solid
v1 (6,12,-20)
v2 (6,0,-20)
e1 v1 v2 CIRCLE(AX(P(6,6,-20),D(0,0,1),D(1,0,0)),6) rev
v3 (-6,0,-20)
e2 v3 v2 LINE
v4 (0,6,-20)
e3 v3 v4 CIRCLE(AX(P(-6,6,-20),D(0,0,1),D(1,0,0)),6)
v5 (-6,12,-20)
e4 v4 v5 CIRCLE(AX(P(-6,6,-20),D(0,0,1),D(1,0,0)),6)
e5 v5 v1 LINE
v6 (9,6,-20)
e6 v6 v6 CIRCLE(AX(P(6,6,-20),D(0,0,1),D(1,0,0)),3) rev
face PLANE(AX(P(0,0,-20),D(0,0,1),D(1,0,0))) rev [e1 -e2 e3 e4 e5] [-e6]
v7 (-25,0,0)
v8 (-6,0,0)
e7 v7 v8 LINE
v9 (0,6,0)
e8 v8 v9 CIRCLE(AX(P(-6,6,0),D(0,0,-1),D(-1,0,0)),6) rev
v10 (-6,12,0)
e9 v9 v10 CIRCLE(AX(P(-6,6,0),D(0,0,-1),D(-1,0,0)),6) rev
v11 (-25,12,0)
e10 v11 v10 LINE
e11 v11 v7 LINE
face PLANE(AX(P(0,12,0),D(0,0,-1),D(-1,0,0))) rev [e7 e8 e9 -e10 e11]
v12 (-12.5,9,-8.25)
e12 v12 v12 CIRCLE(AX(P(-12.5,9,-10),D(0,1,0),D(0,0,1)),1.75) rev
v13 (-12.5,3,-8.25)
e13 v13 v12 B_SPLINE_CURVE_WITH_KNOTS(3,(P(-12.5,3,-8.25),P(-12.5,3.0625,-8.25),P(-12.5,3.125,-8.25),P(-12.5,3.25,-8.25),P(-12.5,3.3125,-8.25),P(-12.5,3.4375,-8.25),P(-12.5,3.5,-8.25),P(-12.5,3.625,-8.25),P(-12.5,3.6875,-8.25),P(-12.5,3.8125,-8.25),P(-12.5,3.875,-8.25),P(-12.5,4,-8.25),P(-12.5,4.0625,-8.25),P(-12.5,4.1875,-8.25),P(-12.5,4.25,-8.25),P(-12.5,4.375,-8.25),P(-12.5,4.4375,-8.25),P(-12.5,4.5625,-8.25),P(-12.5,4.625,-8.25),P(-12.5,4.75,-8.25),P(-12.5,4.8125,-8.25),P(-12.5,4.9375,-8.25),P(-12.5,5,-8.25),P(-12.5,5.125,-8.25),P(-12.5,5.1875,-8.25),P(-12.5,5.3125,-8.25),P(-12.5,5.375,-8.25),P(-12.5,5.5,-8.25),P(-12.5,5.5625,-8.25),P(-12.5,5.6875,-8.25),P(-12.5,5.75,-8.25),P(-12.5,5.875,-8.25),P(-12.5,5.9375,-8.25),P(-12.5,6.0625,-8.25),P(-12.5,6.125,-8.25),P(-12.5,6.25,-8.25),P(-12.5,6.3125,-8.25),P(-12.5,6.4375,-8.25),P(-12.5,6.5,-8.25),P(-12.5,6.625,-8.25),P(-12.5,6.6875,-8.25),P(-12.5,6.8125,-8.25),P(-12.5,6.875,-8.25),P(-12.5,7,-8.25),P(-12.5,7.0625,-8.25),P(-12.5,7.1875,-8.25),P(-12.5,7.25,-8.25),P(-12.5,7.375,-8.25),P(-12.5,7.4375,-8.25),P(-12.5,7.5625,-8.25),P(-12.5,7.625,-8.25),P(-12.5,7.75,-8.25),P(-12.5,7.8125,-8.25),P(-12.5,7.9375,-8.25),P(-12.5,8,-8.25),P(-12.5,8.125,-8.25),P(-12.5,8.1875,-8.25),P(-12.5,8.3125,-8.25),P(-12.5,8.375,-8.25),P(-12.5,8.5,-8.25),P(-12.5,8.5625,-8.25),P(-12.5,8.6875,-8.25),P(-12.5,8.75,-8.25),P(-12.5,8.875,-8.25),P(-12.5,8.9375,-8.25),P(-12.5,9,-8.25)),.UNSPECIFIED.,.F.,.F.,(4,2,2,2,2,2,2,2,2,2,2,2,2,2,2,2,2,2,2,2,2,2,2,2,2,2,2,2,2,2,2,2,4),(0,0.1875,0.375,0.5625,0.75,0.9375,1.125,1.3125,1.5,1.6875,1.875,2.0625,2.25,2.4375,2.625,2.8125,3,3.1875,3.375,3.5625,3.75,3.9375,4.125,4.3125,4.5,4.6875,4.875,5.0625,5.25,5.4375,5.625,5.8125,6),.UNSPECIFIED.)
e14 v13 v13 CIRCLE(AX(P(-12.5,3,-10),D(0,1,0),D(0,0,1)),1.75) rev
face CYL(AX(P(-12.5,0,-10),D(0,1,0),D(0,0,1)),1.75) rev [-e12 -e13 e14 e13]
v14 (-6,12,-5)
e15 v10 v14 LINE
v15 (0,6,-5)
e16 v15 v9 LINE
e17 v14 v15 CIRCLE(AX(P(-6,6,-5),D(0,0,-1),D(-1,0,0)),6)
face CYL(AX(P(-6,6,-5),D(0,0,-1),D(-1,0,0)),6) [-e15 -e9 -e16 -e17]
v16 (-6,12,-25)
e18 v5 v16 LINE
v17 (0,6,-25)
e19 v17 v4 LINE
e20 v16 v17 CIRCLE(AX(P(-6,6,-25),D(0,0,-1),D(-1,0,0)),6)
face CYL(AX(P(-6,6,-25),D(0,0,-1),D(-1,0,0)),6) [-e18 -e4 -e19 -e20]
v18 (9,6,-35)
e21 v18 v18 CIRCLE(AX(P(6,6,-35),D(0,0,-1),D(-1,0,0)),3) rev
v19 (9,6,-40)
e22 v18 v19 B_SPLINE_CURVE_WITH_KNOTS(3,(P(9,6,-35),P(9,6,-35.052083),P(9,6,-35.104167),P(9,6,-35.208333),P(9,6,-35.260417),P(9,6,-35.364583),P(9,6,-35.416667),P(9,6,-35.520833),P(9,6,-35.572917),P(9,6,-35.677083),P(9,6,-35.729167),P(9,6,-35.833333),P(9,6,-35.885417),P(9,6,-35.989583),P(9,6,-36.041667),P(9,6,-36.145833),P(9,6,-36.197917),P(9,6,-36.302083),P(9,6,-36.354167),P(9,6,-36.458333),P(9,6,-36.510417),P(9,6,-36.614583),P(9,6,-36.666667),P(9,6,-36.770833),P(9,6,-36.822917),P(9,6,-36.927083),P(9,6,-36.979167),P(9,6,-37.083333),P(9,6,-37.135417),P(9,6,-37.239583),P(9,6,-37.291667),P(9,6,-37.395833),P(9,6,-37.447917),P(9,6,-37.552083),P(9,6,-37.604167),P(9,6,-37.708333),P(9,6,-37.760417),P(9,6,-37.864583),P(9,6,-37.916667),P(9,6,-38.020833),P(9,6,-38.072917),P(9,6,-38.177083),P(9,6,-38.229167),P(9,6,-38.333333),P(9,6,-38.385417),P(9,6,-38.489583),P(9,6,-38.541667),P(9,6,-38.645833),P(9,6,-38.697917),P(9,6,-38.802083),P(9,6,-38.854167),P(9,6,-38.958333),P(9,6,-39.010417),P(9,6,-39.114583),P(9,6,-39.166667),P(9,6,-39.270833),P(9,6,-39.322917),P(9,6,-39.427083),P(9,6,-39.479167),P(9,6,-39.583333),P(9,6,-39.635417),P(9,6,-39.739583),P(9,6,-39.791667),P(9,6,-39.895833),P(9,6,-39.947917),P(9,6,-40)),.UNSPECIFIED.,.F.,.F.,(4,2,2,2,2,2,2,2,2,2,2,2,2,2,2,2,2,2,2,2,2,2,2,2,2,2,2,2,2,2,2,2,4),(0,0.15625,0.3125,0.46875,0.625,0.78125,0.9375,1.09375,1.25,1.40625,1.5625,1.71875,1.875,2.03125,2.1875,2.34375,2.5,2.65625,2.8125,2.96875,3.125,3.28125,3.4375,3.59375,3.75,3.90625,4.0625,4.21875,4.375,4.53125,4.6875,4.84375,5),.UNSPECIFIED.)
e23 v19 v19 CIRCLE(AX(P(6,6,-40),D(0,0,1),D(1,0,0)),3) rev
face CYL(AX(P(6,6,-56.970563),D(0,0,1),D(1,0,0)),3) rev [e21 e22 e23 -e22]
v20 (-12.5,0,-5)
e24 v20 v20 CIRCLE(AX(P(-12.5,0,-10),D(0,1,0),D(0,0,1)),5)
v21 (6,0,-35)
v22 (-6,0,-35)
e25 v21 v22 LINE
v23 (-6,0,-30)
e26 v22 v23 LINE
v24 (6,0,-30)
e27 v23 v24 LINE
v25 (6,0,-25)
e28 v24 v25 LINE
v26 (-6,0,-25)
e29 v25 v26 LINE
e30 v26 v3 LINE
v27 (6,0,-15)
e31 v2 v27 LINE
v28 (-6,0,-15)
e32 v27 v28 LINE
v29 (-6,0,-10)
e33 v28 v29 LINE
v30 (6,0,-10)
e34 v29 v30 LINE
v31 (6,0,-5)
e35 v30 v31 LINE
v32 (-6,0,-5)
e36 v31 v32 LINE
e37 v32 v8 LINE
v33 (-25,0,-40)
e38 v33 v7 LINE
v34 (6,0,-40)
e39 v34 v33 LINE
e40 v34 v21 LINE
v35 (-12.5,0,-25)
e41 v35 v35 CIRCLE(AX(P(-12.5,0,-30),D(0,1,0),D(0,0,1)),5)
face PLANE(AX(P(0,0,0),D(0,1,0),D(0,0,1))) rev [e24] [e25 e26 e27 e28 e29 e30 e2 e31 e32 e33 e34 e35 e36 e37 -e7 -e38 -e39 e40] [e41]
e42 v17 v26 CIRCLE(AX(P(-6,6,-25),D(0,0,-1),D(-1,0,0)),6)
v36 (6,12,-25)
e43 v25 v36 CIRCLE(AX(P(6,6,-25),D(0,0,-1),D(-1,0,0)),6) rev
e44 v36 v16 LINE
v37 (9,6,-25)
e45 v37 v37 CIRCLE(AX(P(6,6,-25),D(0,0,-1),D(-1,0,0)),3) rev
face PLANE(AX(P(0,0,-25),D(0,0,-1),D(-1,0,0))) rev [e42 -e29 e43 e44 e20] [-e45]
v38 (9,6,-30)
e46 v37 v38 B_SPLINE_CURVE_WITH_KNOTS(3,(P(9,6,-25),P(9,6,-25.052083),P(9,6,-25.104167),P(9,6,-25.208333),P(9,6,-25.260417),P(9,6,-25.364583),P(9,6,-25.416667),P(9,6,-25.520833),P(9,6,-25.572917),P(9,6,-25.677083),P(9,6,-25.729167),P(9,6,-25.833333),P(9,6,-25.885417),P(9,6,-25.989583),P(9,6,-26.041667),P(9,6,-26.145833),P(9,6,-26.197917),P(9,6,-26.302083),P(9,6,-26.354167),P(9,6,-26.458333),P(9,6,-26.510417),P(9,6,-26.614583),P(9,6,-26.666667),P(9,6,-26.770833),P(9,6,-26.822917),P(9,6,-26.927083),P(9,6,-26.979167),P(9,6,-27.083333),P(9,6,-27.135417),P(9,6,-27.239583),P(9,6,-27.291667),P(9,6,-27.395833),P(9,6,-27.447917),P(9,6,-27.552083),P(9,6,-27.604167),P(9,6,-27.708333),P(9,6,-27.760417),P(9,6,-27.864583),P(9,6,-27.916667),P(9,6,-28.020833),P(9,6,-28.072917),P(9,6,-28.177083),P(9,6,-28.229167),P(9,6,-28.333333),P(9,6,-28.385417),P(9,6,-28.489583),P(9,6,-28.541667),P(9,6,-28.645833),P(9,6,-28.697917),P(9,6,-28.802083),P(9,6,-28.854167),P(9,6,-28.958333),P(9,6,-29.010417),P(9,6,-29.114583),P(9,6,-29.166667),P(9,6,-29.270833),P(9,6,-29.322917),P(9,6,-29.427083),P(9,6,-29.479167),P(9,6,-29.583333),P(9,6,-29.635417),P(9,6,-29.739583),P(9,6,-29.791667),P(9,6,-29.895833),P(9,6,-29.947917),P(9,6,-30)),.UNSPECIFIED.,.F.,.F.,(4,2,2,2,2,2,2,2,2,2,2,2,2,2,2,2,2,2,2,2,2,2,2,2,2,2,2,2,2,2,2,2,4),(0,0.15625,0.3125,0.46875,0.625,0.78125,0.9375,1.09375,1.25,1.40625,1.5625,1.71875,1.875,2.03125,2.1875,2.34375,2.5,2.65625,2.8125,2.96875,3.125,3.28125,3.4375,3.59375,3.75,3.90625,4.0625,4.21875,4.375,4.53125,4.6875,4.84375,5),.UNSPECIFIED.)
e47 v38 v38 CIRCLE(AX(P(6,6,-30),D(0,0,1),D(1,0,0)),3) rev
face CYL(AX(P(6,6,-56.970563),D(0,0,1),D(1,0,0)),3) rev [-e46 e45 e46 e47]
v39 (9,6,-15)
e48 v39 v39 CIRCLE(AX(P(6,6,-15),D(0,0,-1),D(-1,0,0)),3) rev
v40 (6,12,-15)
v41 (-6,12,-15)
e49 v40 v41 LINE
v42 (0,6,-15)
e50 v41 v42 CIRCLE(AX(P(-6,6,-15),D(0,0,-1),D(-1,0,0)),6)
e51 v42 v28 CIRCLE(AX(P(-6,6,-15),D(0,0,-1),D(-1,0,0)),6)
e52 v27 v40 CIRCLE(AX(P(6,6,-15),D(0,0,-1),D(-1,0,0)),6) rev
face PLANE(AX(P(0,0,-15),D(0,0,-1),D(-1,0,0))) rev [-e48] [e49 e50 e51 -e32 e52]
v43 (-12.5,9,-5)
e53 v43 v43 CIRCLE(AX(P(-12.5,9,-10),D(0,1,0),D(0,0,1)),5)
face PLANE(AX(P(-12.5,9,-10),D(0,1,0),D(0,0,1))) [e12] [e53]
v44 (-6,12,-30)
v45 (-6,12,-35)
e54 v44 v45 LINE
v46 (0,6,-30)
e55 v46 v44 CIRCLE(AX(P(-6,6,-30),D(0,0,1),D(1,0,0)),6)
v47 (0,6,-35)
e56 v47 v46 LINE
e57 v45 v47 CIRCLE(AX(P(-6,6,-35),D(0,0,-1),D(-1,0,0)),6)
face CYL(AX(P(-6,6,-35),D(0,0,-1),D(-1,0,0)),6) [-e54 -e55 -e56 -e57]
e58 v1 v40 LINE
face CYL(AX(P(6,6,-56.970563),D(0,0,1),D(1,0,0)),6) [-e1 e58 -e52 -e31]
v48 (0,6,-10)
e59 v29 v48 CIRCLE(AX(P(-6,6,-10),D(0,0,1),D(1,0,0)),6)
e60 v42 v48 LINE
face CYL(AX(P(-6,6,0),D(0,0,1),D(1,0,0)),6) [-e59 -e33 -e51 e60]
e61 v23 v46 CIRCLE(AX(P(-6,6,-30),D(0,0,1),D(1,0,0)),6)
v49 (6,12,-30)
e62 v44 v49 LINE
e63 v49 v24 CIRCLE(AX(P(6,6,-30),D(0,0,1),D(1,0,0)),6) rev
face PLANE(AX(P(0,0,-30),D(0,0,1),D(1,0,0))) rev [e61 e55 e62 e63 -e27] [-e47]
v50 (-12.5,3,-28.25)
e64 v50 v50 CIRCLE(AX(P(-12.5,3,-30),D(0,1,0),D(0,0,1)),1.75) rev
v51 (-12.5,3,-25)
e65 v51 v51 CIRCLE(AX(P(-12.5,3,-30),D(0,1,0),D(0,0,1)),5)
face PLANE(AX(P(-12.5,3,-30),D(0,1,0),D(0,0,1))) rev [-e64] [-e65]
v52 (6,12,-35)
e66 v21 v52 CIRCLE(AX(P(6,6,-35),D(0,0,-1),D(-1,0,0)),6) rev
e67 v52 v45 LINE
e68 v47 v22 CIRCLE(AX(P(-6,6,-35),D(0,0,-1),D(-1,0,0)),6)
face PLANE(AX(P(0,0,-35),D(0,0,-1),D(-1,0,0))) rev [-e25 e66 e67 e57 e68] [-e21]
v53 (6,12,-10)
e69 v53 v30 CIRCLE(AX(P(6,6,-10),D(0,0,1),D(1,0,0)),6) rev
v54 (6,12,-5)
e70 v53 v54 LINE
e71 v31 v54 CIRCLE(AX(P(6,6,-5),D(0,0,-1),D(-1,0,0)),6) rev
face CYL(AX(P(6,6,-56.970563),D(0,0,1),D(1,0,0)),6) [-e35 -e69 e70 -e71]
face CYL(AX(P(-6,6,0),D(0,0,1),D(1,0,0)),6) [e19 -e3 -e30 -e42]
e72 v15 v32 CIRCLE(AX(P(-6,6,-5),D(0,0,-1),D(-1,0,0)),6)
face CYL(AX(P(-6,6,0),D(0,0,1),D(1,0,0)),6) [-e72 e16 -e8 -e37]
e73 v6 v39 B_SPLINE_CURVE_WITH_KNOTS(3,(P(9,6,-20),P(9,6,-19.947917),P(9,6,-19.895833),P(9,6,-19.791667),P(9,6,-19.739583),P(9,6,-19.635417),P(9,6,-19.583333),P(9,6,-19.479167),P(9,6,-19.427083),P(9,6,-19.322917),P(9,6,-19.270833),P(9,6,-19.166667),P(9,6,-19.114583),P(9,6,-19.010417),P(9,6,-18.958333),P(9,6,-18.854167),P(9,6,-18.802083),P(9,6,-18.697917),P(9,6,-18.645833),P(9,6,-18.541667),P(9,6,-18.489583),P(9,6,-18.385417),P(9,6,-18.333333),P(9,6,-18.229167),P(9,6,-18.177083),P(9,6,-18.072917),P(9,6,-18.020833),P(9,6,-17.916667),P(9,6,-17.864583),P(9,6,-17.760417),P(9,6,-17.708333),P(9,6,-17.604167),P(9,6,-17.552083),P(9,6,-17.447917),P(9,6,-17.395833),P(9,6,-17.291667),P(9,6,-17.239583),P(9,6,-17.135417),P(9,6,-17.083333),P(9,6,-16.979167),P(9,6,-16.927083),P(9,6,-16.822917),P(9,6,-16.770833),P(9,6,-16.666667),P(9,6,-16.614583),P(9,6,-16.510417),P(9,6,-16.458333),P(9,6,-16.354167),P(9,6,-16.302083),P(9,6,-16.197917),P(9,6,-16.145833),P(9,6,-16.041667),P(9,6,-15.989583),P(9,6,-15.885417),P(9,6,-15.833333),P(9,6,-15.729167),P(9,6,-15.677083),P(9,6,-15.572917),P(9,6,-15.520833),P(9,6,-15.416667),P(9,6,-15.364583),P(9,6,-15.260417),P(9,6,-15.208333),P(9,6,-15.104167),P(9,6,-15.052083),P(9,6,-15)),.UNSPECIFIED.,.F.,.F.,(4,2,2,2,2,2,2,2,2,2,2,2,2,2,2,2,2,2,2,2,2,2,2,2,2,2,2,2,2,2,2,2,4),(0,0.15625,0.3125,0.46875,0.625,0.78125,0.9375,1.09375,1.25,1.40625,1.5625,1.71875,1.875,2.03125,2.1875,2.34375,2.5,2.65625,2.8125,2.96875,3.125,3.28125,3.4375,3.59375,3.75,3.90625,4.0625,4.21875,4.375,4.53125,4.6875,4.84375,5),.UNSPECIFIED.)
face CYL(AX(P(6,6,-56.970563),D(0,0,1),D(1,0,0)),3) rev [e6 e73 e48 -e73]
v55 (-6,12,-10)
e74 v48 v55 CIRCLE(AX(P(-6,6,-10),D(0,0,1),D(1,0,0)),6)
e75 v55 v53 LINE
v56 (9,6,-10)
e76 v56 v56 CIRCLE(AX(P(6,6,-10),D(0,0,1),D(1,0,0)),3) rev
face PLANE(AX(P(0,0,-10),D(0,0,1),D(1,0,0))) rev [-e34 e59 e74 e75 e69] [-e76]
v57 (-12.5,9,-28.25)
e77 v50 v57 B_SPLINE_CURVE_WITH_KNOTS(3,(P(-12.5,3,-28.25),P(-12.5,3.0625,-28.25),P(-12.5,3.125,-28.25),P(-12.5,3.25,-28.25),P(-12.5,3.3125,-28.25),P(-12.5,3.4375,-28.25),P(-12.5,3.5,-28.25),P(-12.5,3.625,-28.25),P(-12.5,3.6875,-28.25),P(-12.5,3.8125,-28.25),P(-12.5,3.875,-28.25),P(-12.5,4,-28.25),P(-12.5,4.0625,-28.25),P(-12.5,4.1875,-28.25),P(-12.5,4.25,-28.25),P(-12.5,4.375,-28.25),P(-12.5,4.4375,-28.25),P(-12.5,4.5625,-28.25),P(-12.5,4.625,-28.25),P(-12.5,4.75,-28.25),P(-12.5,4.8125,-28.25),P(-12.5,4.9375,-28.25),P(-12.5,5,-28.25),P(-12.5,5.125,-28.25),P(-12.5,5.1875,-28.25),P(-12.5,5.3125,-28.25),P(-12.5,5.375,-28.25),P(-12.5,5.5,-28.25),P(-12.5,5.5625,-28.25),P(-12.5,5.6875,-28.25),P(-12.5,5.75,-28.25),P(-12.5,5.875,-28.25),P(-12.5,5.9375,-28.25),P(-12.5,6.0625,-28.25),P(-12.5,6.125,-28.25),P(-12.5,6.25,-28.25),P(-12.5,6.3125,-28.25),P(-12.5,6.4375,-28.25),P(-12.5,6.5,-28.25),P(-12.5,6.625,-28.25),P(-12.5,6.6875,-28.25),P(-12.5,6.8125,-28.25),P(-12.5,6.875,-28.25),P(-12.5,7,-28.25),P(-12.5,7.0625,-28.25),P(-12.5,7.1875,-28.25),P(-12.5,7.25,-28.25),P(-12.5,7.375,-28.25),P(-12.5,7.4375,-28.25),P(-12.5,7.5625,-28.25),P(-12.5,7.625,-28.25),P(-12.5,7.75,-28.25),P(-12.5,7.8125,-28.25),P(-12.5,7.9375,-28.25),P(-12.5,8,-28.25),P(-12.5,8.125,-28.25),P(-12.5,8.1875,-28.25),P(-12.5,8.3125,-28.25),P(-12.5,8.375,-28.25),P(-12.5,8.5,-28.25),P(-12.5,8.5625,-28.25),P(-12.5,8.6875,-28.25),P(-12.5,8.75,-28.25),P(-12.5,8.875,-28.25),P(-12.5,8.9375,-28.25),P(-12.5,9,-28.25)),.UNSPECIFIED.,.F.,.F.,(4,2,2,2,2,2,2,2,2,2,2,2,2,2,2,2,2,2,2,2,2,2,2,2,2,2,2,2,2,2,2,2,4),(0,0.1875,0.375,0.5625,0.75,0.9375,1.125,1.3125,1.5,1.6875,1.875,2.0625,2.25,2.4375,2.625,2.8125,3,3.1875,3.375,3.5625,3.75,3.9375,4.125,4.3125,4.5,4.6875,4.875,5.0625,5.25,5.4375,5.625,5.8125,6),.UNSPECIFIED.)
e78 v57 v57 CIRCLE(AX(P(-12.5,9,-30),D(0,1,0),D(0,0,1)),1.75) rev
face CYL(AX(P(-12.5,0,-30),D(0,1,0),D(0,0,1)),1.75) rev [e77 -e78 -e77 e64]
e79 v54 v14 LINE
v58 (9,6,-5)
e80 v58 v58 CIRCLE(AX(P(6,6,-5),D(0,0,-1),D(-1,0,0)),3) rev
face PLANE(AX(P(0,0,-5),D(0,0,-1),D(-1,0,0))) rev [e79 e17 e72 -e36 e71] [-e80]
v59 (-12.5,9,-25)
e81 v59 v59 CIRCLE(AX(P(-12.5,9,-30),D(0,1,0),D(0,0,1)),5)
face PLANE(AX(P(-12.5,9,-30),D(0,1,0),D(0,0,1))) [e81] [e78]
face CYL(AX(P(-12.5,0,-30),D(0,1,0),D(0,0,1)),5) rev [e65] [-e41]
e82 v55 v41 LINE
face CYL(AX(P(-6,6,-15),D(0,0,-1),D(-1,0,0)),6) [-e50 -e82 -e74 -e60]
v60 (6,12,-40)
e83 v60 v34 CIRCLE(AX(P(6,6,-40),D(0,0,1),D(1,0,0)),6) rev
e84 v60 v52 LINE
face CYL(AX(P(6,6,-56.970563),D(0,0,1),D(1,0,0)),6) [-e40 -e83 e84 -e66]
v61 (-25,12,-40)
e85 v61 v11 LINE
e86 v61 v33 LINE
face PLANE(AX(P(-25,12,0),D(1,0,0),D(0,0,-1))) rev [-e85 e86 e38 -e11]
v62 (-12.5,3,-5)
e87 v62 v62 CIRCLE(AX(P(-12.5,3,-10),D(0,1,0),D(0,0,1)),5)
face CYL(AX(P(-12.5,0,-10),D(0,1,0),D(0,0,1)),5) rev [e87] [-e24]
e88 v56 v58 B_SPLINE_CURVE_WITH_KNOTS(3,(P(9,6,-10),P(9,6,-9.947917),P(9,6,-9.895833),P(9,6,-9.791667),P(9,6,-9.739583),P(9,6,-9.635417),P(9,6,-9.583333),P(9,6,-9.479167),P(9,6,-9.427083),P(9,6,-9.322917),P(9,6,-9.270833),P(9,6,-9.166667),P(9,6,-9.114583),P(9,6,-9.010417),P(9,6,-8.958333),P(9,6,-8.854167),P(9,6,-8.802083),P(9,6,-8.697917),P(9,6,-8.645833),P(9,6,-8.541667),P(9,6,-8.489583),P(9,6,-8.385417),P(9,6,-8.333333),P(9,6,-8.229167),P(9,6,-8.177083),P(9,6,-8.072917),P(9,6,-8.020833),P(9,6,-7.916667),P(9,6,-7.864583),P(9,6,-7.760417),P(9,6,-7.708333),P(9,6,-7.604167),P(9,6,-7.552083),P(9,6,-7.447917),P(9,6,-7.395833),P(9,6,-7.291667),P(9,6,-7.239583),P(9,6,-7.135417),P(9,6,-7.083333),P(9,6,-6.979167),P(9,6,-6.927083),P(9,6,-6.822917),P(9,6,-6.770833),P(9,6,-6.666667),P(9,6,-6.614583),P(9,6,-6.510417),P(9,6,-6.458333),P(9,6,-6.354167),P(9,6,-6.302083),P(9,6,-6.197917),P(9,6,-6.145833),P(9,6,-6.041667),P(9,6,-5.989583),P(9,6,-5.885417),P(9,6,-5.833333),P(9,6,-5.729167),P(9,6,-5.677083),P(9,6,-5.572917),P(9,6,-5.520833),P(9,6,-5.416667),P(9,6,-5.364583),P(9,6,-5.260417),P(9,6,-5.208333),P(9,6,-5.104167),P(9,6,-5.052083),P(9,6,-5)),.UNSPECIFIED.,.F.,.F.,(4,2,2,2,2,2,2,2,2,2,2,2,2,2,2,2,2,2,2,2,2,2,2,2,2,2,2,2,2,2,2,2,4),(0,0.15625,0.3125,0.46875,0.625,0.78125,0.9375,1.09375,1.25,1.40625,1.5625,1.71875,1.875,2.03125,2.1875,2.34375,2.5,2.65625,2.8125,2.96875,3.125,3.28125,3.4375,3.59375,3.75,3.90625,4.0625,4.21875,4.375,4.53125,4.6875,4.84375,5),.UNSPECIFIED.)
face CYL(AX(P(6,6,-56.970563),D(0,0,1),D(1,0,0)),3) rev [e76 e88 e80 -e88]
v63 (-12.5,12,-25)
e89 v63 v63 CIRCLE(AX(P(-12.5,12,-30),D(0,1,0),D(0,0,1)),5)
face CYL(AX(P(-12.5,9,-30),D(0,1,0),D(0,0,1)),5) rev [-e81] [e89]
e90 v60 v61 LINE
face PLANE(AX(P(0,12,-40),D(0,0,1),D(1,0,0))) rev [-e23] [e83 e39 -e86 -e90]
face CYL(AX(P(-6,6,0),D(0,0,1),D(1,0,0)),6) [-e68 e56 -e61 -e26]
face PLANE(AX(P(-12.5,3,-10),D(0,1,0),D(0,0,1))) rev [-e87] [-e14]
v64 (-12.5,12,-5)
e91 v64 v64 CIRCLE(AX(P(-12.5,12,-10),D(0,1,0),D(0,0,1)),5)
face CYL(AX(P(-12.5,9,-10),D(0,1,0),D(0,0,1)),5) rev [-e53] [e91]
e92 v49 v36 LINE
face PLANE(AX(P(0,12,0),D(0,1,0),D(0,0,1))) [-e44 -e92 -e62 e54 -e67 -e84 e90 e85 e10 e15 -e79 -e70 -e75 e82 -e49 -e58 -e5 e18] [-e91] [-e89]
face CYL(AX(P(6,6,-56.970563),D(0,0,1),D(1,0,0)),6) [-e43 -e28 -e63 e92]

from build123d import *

# Parameters (mm, degrees)
SKETCH1_W           = 25
SKETCH1_H           = 40
BOSS_EXTRUDE1_DEPTH = 12
SKETCH2_R           = 3
BOSS_EXTRUDE2_DEPTH = 40
SKETCH3_W           = 12
SKETCH3_H           = 5
CUT_EXTRUDE1_DEPTH  = 49.672374095
LPATTERN1_COUNT     = 4
LPATTERN1_PITCH     = 10
SKETCH4_R           = 1.75
CUT_EXTRUDE2_DEPTH  = 49.672374095
SKETCH5_R           = 5
CUT_EXTRUDE3_DEPTH  = 3
LPATTERN2_COUNT     = 2
LPATTERN2_PITCH     = 9
FILLET1_R           = 6


with BuildPart() as part:
    # Sketch1 → Boss-Extrude1 (new body)
    with BuildSketch(Plane(origin=(0, 0, 0), x_dir=(1, 0, 0), z_dir=(0, 1, 0))):
        with Locations((-12.5, 20)):
            Rectangle(SKETCH1_W, SKETCH1_H)
    extrude(amount=BOSS_EXTRUDE1_DEPTH)

    # Sketch2 → Boss-Extrude2 (add)
    with BuildSketch(Plane.XY):
        with BuildLine():
            Line((0, 6), (0, 0))
            Line((0, 0), (6, 0))
            ThreePointArc((6, 0), (12, 6), (6, 12))
            Line((6, 12), (0, 12))
            Line((0, 12), (0, 6))
        make_face()
        with Locations((6, 6)):
            Circle(SKETCH2_R, mode=Mode.SUBTRACT)
    extrude(amount=-BOSS_EXTRUDE2_DEPTH)

    # Sketch3 → Cut-Extrude1 (cut, through all)
    with BuildSketch(Plane(origin=(0, 12, 0), x_dir=(1, 0, 0), z_dir=(0, 1, 0))):
        with Locations((6, 32.5)):
            Rectangle(SKETCH3_W, SKETCH3_H)
    cut_extrude1 = extrude(amount=-CUT_EXTRUDE1_DEPTH, mode=Mode.SUBTRACT)

    # LPattern1: Cut-Extrude1 ×4
    with Locations(*[(0, 0, i * LPATTERN1_PITCH) for i in range(1, LPATTERN1_COUNT)]):
        add(cut_extrude1, mode=Mode.SUBTRACT)

    # Sketch4 → Cut-Extrude2 (cut, through all)
    with BuildSketch(Plane(origin=(0, 12, 0), x_dir=(1, 0, 0), z_dir=(0, 1, 0))):
        with Locations(Location((-12.5, 30, 0), (0, 0, 270))):
            Circle(SKETCH4_R)
        with Locations(Location((-12.5, 10, 0), (0, 0, 270))):
            Circle(SKETCH4_R)
    extrude(amount=-CUT_EXTRUDE2_DEPTH, mode=Mode.SUBTRACT)

    # Sketch5 → Cut-Extrude3 (cut)
    with BuildSketch(Plane(origin=(0, 12, 0), x_dir=(1, 0, 0), z_dir=(0, 1, 0))):
        with Locations(Location((-12.5, 30, 0), (0, 0, 270))):
            Circle(SKETCH5_R)
        with Locations(Location((-12.5, 10, 0), (0, 0, 270))):
            Circle(SKETCH5_R)
    cut_extrude3 = extrude(amount=-CUT_EXTRUDE3_DEPTH, mode=Mode.SUBTRACT)

    # LPattern2: Cut-Extrude3 ×2
    with Locations(*[(0, -i * LPATTERN2_PITCH, 0) for i in range(1, LPATTERN2_COUNT)]):
        add(cut_extrude3, mode=Mode.SUBTRACT)

    # Fillet1
    fillet1_edges = [part.edges().sort_by_distance(p)[0] for p in [
        (0, 0, -2.5),
        (0, 12, -2.5),
        (0, 0, -12.5),
        (0, 12, -12.5),
        (0, 0, -22.5),
        (0, 12, -22.5),
        (0, 0, -32.5),
        (0, 12, -32.5),
    ]]
    fillet(fillet1_edges, radius=FILLET1_R - 0.0001)  # a hair under: the kernel refuses the full size


solid = part.part
